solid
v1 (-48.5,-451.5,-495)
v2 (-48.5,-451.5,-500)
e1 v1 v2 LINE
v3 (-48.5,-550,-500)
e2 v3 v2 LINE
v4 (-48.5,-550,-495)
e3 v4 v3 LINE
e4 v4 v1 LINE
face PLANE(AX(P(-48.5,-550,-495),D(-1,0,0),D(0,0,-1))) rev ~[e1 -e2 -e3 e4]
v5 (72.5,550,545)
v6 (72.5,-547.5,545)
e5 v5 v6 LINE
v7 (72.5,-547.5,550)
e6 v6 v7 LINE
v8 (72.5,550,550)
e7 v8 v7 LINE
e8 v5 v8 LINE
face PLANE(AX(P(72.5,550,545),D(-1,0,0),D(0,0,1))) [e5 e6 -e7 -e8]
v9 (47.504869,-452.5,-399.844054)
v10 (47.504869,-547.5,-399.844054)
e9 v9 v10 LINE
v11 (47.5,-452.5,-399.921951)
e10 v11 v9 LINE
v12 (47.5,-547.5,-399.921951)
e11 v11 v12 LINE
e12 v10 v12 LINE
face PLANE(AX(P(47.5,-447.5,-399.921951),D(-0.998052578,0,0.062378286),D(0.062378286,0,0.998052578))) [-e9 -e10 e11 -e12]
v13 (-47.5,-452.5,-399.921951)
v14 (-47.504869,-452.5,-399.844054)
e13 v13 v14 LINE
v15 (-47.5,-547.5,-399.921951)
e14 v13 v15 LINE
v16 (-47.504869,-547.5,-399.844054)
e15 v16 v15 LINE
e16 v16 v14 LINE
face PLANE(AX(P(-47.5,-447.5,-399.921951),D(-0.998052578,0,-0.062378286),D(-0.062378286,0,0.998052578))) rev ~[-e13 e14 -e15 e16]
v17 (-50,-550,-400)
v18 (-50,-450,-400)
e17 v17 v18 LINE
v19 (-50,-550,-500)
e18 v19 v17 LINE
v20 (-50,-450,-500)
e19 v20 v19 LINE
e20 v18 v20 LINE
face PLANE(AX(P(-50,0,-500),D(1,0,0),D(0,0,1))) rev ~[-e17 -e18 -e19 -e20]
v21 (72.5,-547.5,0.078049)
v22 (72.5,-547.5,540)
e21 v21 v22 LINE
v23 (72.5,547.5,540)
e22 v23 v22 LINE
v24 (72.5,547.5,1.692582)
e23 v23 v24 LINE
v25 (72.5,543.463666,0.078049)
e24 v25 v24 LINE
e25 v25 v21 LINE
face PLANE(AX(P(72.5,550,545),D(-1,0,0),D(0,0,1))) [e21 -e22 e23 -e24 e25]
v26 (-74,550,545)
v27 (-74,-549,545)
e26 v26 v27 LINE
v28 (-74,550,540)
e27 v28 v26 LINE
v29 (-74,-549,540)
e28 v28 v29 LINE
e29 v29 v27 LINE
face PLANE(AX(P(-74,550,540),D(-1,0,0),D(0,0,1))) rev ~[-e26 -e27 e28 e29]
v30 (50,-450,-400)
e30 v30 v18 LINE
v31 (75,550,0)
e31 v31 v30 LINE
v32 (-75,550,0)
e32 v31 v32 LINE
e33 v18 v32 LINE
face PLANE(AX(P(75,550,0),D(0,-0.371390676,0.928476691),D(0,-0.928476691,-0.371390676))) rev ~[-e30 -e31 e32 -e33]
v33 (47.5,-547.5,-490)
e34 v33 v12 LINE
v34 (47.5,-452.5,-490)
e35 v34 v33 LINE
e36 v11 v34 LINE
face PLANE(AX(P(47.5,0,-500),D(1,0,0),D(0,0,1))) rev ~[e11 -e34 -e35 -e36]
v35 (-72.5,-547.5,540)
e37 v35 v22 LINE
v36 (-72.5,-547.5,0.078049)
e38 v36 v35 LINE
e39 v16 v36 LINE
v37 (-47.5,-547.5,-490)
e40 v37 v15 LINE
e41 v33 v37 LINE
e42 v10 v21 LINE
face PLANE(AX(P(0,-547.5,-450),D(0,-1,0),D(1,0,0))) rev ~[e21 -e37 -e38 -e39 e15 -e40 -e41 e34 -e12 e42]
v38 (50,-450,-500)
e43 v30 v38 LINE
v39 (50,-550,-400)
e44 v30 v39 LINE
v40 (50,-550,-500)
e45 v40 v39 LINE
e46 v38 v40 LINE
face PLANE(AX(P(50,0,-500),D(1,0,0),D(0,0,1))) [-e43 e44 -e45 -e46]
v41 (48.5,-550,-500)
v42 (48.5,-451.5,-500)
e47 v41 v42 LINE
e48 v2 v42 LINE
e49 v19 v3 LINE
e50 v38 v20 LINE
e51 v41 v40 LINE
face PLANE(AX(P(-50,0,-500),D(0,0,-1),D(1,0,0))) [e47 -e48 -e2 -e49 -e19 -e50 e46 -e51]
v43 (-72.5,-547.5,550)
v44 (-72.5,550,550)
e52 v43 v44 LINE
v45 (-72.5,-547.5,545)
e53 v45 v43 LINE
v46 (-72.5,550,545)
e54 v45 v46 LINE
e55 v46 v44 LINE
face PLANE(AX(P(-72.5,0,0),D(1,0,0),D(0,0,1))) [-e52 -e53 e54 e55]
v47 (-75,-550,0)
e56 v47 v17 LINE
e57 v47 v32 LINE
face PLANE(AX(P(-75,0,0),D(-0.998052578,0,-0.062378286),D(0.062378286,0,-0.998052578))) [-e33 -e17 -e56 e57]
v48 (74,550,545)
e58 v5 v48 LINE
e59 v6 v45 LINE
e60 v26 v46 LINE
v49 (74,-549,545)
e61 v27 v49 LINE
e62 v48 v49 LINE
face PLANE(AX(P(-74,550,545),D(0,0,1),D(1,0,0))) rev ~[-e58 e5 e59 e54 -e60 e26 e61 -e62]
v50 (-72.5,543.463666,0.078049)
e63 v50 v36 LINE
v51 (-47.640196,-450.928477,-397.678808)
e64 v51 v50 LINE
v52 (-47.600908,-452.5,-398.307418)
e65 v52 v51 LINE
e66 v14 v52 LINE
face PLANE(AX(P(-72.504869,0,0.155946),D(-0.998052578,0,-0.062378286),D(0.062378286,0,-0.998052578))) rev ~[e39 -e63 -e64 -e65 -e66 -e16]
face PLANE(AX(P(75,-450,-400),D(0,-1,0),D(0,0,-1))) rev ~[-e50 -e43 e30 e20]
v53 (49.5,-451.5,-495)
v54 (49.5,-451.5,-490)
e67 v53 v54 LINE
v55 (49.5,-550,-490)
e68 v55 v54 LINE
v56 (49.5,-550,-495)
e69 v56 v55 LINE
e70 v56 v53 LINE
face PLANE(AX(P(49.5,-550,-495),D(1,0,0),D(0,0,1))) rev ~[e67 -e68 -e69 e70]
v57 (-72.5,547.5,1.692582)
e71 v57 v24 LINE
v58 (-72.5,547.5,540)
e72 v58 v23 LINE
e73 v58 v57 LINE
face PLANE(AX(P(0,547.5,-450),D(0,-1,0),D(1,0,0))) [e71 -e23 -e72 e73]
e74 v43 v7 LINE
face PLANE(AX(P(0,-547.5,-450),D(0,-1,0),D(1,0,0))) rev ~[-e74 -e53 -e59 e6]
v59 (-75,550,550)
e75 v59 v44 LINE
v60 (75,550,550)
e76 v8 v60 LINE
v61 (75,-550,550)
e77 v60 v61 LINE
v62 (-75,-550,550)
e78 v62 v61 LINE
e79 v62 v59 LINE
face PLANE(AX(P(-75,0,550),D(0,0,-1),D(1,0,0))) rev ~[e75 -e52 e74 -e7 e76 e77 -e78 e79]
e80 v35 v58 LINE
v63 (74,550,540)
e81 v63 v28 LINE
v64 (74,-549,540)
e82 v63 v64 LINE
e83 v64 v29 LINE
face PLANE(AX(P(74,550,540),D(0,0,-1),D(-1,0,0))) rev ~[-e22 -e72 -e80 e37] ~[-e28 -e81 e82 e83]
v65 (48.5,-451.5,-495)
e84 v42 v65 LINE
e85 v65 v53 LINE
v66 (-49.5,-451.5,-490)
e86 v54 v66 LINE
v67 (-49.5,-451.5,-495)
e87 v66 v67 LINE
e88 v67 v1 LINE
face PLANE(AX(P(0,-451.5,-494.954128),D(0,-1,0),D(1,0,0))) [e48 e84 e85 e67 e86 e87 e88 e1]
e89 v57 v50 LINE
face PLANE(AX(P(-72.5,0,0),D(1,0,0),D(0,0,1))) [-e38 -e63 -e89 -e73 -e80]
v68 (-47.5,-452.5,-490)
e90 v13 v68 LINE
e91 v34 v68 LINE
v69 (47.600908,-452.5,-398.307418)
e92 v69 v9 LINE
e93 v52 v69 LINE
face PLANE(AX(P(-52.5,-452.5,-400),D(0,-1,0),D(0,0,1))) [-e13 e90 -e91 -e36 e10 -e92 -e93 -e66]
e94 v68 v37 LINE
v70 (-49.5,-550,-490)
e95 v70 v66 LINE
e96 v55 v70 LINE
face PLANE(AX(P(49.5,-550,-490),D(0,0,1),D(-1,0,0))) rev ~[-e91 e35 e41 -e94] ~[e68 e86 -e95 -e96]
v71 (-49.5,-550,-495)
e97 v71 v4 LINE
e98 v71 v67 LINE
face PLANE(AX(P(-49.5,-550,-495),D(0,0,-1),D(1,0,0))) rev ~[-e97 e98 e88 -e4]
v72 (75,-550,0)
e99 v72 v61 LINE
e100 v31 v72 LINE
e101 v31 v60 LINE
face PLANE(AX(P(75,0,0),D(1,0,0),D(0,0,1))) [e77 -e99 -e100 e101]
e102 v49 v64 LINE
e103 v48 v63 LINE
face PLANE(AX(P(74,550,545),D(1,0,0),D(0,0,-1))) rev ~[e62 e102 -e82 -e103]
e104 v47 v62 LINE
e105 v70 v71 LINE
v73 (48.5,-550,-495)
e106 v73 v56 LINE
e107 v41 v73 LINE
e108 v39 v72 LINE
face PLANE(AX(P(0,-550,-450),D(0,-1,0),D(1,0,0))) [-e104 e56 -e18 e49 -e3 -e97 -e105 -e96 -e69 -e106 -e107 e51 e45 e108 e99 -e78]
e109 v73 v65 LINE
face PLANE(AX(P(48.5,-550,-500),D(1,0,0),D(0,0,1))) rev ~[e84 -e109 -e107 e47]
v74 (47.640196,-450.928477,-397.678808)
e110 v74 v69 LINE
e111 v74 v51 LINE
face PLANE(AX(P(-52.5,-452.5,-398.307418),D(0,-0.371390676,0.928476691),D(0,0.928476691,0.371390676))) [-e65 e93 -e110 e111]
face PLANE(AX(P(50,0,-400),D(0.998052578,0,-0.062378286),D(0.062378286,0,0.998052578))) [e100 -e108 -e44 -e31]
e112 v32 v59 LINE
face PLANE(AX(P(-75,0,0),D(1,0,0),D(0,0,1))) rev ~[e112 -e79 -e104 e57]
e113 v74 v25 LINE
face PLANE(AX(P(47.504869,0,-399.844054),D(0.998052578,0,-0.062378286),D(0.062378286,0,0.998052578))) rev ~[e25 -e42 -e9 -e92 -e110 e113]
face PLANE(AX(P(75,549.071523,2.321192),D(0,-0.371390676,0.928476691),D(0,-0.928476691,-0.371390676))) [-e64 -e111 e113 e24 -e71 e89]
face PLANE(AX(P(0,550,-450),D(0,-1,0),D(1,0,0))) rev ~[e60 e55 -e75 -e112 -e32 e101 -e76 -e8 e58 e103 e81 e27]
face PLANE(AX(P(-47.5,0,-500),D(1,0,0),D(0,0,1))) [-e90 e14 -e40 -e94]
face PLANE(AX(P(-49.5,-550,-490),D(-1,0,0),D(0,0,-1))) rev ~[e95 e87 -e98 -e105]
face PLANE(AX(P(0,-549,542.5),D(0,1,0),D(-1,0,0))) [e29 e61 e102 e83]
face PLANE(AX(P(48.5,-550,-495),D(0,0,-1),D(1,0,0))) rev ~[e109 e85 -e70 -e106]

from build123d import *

# Parameters (mm, degrees)
F0_W        = 100
F0_H        = 100
F0_W_2      = 150
F0_H_2      = 550
F1_DEPTH    = 550
F3_DEPTH    = 150
F4_T        = 2.5
F4_T3_DEPTH = 105
F4_T5_DEPTH = 105
F6_DEPTH    = 98.5
F7_W        = 145
F7_H        = 5
F8_DEPTH    = 2.5
F9_DEPTH    = 1099


# Not quite as in the source:
# - a shell that OpenCascade refuses in one call is made with other operations: the cavity is built on its own and cut out


with BuildPart() as f1:
    # F0 (on Front) → F1 (new body, symmetric)
    with BuildSketch(Plane.XZ):
        with Locations((0, -450)):
            Rectangle(F0_W, F0_H)
        with Locations((0, 275)):
            Rectangle(F0_W_2, F0_H_2)
        Polygon((75, 0), (-75, 0), (-50, -400), (50, -400), align=None)
    extrude(amount=F1_DEPTH, both=True)

    # F2 (on face) → F3 (cut)
    with BuildSketch(Plane.YZ.offset(75)):
        Polygon((550, -500), (550, 0), (-450, -400), (-450, -500), align=None)
    extrude(amount=-F3_DEPTH, mode=Mode.SUBTRACT)

    # F4: shell of thickness 2.5, made by hand


with BuildPart() as f4_core1:
    # F4_t2: copy of F1
    add(f1.part)

    # the walls: a layer under each face that stays
    f4_faces = [f4_core1.faces().sort_by_distance(p)[0] for p in [
        (-50, -500, -450),
        (-62.5, 0, -200),
        (0, -550, 25),
        (0, -450, -450),
        (-75, 0, 275),
        (0, 50, -200),
        (50, -500, -450),
        (62.5, 0, -200),
        (75, 0, 275),
        (0, 550, 275),
    ]]
    thicken(f4_faces, amount=-F4_T, mode=Mode.SUBTRACT)

    # F4_s4 → F4_t3 (cut)
    with BuildSketch(Plane.XZ.offset(447.5)):
        Polygon((-50.0499513145, -400.0015594572), (-47.5, -400), (-47.5, -399.9219511453), (-47.5048685538, -399.8440542846), align=None)
        Polygon((50.0499513145, -400.0015594572), (47.5, -400), (47.5, -399.9219511453), (47.5048685538, -399.8440542846), align=None)
    extrude(amount=F4_T3_DEPTH, mode=Mode.SUBTRACT)

    # F4_s6 → F4_t5 (cut)
    with BuildSketch(Plane.YZ.offset(-52.5)):
        Polygon((-449.9657152331, -400.0232119173), (-452.5, -400), (-452.5, -398.3074175964), (-450.9284766909, -397.6788082728), align=None)
    extrude(amount=F4_T5_DEPTH, mode=Mode.SUBTRACT)


with BuildPart() as f1_1:
    add(f1.part)

    # what is left inside the walls is the cavity
    f4_cavity = [f4_core1.part.solids().sort_by_distance(p)[0] for p in [
        (-72.475, 182.5, 275.039024),
    ]]
    add(f4_cavity, mode=Mode.SUBTRACT)

    # F5 (on face) → F6 (cut)
    with BuildSketch(Plane.XZ.offset(550)):
        Polygon((-48.5, -495), (-48.5, -500), (48.5, -500), (48.5, -495), (49.5, -495), (49.5, -490), (-49.5, -490), (-49.5, -495), align=None)
    extrude(amount=-F6_DEPTH, mode=Mode.SUBTRACT)

    # F7 (on face) → F8 (cut)
    with BuildSketch(Plane(origin=(0, 550, 0), x_dir=(-1, 0, 0), z_dir=(0, 1, 0))):
        with Locations((0, 547.5)):
            Rectangle(F7_W, F7_H)
    extrude(amount=-F8_DEPTH, mode=Mode.SUBTRACT)

    # F7 (on face) → F9 (cut)
    with BuildSketch(Plane(origin=(0, 550, 0), x_dir=(-1, 0, 0), z_dir=(0, 1, 0))):
        Polygon((-74, 545), (-74, 540), (74, 540), (74, 545), (72.5, 545), (-72.5, 545), align=None)
    extrude(amount=-F9_DEPTH, mode=Mode.SUBTRACT)


solid = f1_1.part
